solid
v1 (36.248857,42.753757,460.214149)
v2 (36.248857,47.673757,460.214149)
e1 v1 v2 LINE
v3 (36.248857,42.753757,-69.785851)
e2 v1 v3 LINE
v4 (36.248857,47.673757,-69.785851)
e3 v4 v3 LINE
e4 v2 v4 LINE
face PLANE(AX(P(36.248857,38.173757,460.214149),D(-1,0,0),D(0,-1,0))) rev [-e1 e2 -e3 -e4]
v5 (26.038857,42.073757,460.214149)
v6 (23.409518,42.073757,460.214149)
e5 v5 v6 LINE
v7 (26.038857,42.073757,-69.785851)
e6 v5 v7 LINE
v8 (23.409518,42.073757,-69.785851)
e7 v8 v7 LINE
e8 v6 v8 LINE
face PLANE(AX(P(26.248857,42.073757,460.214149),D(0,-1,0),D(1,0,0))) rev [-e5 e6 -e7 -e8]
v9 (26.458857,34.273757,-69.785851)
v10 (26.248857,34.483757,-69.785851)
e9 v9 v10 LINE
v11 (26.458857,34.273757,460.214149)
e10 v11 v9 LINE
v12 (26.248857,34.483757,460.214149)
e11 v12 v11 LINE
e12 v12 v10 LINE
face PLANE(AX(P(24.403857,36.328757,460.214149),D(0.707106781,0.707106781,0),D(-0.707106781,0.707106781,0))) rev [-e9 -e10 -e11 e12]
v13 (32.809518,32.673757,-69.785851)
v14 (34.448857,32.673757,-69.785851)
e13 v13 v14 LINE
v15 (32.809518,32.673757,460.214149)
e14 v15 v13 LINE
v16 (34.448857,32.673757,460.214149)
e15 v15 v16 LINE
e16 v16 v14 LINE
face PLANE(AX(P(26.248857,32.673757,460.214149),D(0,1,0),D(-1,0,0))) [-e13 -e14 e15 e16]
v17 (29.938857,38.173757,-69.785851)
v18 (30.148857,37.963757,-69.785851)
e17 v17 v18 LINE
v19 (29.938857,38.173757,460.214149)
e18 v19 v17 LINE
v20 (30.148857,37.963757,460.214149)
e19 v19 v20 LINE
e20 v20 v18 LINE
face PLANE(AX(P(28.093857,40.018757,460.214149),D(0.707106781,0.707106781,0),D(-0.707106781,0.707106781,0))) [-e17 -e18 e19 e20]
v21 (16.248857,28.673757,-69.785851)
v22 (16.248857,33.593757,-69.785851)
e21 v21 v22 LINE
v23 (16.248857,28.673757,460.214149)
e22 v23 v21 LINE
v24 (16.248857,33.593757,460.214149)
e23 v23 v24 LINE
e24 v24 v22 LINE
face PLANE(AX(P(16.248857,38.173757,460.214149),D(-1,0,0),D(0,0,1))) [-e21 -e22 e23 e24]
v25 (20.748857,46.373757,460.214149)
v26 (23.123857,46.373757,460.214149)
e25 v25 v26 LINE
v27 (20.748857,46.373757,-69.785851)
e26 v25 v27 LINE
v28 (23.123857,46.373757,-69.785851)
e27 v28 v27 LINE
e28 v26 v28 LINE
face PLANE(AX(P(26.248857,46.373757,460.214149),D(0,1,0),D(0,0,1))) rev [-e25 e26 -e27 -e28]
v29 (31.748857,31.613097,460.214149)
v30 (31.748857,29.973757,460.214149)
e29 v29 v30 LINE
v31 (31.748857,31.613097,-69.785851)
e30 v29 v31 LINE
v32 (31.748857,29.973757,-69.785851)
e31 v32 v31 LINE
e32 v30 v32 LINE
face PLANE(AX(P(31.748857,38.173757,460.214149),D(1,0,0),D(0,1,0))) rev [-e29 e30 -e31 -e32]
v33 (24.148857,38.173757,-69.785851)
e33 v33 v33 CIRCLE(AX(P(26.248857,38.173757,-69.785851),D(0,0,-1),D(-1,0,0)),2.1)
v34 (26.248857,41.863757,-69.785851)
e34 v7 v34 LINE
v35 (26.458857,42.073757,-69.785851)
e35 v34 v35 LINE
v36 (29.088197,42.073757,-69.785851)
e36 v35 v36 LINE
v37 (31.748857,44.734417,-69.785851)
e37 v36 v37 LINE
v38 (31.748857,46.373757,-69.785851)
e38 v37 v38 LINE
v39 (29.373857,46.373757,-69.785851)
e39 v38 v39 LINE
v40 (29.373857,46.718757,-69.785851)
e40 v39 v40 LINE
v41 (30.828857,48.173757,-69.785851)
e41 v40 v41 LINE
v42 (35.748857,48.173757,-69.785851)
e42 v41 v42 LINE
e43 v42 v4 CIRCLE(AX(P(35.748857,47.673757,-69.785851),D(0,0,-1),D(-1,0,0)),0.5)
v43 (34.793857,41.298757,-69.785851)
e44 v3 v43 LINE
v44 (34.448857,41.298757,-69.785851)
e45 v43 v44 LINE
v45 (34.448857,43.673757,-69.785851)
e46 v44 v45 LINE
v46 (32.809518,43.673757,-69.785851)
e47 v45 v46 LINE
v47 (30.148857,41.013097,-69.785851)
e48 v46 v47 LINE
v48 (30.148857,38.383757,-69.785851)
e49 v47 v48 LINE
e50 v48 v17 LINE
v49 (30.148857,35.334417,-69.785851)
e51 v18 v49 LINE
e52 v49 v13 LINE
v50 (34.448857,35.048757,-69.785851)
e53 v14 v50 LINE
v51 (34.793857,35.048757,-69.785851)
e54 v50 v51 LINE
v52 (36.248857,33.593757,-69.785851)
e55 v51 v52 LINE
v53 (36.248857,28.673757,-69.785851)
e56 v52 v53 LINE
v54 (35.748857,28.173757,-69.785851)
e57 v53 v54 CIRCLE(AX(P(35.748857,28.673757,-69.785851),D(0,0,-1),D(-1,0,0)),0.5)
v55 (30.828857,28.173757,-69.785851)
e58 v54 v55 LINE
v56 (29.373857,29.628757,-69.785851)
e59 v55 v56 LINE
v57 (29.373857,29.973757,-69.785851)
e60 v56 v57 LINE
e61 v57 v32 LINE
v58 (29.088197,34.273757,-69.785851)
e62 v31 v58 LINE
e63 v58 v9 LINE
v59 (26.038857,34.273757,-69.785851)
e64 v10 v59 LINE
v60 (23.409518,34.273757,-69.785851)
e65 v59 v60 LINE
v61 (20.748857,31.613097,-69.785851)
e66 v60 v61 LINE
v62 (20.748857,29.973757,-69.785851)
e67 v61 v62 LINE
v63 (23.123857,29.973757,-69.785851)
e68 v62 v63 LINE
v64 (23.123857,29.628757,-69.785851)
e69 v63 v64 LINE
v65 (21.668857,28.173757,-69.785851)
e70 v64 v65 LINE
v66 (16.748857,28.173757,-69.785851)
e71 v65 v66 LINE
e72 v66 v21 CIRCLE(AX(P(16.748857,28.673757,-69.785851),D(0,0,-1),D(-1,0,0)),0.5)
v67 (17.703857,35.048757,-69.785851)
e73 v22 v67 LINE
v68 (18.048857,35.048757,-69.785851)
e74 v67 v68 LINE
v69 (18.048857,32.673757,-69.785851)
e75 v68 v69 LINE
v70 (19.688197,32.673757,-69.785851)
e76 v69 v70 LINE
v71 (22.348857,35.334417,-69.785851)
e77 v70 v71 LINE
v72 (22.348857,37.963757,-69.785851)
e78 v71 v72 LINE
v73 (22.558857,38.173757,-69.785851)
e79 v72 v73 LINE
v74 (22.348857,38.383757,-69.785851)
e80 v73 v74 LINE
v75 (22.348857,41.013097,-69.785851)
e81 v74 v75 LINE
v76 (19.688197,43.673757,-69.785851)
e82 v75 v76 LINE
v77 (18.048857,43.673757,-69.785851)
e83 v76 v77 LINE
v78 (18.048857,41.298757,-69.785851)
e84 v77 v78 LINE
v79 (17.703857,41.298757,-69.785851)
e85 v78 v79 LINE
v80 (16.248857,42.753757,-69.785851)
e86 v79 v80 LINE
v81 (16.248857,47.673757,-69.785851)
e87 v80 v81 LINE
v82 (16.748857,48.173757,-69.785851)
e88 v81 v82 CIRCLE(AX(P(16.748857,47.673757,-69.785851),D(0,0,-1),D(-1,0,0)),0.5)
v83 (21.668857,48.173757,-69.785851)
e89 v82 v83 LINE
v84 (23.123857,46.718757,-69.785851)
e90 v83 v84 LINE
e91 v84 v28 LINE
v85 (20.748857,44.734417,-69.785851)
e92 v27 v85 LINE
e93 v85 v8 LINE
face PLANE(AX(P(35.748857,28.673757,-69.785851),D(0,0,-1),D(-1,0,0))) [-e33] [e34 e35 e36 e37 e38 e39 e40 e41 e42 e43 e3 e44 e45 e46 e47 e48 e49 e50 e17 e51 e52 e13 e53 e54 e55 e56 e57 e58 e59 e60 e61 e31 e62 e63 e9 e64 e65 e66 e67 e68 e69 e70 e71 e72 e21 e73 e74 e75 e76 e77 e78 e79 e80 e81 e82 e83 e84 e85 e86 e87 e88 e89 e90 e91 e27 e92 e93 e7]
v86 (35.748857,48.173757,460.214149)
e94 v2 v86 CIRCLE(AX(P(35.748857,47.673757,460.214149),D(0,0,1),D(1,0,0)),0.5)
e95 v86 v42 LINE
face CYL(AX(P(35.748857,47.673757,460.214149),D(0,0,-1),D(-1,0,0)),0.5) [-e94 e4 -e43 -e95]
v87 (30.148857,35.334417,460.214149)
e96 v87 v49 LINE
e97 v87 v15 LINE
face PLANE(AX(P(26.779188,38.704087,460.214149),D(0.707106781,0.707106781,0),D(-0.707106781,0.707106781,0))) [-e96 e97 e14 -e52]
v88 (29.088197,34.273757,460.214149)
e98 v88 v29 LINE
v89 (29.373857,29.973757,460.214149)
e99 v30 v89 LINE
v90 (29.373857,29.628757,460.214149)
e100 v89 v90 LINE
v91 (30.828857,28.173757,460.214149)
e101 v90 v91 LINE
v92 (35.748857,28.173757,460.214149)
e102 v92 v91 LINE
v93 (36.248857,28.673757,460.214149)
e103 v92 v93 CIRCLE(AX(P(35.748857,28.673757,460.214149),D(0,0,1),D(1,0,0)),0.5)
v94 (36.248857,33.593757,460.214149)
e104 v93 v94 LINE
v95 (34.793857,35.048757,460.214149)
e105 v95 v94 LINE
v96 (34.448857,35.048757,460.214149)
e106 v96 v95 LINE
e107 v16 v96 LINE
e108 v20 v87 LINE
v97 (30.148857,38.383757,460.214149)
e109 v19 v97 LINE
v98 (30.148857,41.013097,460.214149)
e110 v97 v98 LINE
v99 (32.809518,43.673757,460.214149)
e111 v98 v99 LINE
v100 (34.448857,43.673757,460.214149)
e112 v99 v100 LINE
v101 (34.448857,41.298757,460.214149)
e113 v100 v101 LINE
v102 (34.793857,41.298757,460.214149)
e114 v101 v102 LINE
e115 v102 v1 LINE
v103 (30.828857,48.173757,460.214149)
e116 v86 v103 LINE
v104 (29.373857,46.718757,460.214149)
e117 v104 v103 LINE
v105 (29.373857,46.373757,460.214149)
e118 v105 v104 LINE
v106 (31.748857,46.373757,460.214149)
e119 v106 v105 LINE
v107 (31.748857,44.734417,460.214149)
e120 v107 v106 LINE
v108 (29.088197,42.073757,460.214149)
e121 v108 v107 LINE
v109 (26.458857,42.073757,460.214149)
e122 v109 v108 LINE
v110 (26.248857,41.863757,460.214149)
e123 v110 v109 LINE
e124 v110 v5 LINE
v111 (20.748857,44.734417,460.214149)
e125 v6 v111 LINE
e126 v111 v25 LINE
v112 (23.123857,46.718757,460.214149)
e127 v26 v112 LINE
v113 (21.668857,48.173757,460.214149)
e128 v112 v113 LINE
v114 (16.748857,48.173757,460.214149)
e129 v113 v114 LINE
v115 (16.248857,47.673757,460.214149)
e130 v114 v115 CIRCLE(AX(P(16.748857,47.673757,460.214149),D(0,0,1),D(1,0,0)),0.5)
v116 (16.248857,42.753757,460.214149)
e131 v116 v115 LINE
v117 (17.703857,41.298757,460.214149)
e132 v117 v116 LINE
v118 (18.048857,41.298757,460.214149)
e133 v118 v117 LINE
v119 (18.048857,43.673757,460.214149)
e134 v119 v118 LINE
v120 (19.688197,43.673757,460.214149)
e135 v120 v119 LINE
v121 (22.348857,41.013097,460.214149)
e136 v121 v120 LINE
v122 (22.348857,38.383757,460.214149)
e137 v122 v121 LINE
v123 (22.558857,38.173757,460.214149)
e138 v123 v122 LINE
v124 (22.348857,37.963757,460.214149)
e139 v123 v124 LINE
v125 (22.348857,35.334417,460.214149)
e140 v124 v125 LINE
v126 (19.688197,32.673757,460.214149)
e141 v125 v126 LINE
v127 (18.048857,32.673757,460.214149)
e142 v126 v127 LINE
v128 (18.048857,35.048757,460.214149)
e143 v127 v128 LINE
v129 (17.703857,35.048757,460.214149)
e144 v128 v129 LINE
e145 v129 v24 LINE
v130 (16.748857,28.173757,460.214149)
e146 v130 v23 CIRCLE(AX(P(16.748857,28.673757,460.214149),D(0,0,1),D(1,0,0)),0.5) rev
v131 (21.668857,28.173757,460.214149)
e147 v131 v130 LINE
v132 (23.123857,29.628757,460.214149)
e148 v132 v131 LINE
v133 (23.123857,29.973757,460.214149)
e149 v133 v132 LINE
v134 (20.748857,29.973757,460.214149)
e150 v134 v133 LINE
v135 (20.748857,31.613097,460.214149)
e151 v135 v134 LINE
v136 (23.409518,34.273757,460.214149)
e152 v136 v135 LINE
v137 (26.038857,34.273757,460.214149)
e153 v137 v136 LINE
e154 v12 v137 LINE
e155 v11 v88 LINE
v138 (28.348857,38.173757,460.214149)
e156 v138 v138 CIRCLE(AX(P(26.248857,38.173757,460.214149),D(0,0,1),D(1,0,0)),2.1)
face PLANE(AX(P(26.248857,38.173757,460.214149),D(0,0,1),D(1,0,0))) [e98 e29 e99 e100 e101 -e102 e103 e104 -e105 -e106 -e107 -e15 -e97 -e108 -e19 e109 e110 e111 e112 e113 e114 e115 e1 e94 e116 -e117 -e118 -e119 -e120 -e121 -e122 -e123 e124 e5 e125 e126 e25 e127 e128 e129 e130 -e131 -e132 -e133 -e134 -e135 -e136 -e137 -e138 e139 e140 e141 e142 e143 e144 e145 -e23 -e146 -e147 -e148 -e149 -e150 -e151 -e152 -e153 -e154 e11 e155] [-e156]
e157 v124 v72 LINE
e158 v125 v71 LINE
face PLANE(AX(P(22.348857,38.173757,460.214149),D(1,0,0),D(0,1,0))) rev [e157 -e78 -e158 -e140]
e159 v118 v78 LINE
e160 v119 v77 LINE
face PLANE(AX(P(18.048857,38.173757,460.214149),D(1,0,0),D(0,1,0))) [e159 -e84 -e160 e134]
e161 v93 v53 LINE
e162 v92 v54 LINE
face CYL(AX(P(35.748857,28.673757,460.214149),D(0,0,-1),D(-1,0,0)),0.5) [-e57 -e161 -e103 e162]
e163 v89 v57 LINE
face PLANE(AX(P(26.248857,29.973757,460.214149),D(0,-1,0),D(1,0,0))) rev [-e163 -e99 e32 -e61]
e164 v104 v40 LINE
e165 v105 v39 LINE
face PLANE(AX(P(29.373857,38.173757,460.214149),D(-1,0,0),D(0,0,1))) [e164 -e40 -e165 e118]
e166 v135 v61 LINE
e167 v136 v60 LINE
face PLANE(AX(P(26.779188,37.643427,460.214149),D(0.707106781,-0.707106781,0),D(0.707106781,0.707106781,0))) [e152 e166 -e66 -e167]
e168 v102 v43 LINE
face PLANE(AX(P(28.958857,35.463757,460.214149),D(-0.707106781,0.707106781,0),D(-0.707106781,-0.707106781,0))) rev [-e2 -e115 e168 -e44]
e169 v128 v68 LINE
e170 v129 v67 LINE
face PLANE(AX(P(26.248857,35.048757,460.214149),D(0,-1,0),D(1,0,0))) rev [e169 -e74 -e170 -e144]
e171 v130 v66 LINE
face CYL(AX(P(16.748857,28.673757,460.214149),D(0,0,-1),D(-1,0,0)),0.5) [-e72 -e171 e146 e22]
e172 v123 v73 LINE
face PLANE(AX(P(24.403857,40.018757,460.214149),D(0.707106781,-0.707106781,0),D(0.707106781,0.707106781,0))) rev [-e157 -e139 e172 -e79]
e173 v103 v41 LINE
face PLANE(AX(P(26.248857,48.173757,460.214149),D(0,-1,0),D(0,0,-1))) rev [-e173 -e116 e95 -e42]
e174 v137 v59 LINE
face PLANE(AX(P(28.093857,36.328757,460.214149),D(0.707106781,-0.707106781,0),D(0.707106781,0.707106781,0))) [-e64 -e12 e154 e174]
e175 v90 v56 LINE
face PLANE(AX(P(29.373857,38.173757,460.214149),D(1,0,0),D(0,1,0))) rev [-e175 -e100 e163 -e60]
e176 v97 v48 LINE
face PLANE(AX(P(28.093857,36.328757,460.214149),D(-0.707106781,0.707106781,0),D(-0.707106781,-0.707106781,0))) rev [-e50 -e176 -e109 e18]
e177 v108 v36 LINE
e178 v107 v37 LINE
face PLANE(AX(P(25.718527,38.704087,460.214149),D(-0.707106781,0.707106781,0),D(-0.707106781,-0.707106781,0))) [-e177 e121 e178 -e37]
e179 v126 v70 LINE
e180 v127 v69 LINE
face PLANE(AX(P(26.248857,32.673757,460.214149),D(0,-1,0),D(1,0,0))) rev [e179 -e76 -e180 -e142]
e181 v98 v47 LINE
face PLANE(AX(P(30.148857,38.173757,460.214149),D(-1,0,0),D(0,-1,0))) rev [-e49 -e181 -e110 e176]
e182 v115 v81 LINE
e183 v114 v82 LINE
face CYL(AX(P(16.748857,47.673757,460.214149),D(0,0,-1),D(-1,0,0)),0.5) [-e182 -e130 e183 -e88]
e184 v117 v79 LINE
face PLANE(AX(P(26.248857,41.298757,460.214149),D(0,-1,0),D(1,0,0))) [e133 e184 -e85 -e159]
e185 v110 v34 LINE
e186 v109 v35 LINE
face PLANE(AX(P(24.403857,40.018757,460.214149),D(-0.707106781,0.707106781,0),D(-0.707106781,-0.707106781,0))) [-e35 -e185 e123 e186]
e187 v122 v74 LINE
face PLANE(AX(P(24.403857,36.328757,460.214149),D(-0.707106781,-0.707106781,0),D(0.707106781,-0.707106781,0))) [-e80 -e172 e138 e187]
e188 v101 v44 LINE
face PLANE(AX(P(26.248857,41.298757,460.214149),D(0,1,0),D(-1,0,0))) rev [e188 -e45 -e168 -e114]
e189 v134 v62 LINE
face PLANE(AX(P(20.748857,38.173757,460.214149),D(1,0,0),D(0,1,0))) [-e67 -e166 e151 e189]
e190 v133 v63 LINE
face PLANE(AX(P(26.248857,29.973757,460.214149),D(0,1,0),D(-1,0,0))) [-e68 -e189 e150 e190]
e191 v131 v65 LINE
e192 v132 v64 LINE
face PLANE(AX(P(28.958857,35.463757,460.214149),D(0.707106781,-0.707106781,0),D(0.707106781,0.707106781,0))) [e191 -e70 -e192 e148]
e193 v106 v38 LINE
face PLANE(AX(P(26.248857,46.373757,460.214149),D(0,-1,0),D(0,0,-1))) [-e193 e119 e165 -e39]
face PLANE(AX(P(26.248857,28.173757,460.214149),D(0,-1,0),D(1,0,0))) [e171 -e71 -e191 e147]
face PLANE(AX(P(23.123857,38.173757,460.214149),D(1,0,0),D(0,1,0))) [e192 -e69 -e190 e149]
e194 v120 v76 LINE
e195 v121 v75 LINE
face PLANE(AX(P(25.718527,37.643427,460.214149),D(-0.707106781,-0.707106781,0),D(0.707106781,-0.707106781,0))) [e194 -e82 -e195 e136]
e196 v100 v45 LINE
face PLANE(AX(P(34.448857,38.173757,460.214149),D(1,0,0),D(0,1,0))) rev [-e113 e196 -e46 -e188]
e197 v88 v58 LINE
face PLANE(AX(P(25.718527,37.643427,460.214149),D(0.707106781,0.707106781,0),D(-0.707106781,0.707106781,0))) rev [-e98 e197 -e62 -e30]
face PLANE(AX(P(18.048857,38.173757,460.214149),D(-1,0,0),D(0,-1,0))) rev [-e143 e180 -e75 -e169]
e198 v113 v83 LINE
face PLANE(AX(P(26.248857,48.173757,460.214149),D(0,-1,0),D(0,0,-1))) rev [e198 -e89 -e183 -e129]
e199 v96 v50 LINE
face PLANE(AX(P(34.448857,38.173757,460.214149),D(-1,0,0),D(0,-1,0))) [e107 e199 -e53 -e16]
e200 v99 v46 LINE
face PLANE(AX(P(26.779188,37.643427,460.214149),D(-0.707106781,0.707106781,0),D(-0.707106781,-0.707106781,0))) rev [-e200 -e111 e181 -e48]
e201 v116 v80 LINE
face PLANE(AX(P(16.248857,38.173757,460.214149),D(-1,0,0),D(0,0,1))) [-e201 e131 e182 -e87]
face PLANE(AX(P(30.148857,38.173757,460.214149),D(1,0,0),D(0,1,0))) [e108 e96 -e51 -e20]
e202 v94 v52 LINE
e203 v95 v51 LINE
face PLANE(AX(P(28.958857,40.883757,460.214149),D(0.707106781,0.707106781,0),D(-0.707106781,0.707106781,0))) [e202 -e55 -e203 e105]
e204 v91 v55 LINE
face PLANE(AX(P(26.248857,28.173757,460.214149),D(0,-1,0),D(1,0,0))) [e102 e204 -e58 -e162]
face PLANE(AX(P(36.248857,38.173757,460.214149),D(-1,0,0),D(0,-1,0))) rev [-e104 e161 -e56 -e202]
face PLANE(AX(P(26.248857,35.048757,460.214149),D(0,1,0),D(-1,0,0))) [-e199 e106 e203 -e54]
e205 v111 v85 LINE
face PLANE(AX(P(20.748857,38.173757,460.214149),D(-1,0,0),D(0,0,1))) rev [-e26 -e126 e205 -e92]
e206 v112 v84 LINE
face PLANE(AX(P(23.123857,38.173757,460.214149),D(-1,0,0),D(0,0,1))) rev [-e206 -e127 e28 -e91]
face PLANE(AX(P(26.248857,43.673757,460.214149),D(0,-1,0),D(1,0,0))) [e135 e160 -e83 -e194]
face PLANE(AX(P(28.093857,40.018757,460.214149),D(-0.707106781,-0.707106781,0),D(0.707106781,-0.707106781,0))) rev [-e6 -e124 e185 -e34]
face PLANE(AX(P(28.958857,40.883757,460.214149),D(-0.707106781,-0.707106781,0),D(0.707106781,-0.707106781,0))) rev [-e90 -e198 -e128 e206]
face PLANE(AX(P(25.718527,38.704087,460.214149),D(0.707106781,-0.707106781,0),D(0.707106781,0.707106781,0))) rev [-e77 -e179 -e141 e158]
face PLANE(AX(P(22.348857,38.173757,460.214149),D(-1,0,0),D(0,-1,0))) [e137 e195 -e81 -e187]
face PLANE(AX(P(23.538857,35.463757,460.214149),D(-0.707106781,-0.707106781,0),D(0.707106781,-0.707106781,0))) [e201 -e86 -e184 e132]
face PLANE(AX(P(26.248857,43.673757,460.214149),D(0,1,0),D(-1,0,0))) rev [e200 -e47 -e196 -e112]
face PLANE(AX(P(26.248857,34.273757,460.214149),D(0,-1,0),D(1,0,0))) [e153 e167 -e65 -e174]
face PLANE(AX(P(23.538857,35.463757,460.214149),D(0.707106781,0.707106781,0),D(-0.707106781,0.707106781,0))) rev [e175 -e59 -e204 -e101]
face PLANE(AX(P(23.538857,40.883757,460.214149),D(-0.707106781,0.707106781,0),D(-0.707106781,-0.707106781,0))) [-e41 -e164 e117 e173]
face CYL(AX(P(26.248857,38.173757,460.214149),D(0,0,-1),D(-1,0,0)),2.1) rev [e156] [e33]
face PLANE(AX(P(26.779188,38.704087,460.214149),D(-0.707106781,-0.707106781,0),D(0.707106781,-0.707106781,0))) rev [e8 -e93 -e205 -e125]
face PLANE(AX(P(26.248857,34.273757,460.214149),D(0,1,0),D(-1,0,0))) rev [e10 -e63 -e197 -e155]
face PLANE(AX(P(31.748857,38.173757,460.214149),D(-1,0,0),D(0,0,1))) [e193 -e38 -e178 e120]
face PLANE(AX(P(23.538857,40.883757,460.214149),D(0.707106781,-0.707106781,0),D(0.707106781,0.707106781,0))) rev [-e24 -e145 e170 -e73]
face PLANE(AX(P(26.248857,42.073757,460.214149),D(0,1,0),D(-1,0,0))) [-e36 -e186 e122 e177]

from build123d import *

# Parameters (mm, degrees)
V_SLOT_START                           = -39.785851387
V_SLOT_20X20X500_LINEAR_RAIL_OUTLINE_R = 2.1
V_SLOT_20X20X500_LINEAR_RAIL_DEPTH     = 500
BOSS_EXTRUDE1_START                    = 30
SKETCH1_R                              = 2.1
BOSS_EXTRUDE1_DEPTH                    = 30


# Read off the part's stored shape, not the designer's step: V-Slot 20x20x500 Linear Rail
with BuildPart() as part:
    # V-Slot 20x20x500 Linear Rail outline → V-Slot 20x20x500 Linear Rail (new body)
    with BuildSketch(Plane.XY.offset(V_SLOT_START)):
        with BuildLine():
            Line((30.148857471, 35.33441708), (30.148857471, 37.963756908))
            Line((30.148857471, 37.963756908), (29.938857471, 38.173756908))
            Line((29.938857471, 38.173756908), (30.148857471, 38.383756908))
            Line((30.148857471, 38.383756908), (30.148857471, 41.013096736))
            Line((30.148857471, 41.013096736), (32.809517643, 43.673756908))
            Line((32.809517643, 43.673756908), (34.448857471, 43.673756908))
            Line((34.448857471, 43.673756908), (34.448857471, 41.298756908))
            Line((34.448857471, 41.298756908), (34.793857471, 41.298756908))
            Line((34.793857471, 41.298756908), (36.248857471, 42.753756908))
            Line((36.248857471, 42.753756908), (36.248857471, 47.673756908))
            ThreePointArc((36.248857471, 47.673756908), (36.102410862, 48.027310299), (35.748857471, 48.173756908))
            Line((35.748857471, 48.173756908), (30.828857471, 48.173756908))
            Line((30.828857471, 48.173756908), (29.373857471, 46.718756908))
            Line((29.373857471, 46.718756908), (29.373857471, 46.373756908))
            Line((29.373857471, 46.373756908), (31.748857471, 46.373756908))
            Line((31.748857471, 46.373756908), (31.748857471, 44.73441708))
            Line((31.748857471, 44.73441708), (29.0881973, 42.073756908))
            Line((29.0881973, 42.073756908), (26.458857471, 42.073756908))
            Line((26.458857471, 42.073756908), (26.248857471, 41.863756908))
            Line((26.248857471, 41.863756908), (26.038857471, 42.073756908))
            Line((26.038857471, 42.073756908), (23.409517643, 42.073756908))
            Line((23.409517643, 42.073756908), (20.748857471, 44.73441708))
            Line((20.748857471, 44.73441708), (20.748857471, 46.373756908))
            Line((20.748857471, 46.373756908), (23.123857471, 46.373756908))
            Line((23.123857471, 46.373756908), (23.123857471, 46.718756908))
            Line((23.123857471, 46.718756908), (21.668857471, 48.173756908))
            Line((21.668857471, 48.173756908), (16.748857471, 48.173756908))
            ThreePointArc((16.748857471, 48.173756908), (16.395304081, 48.027310298), (16.248857471, 47.673756908))
            Line((16.248857471, 47.673756908), (16.248857471, 42.753756908))
            Line((16.248857471, 42.753756908), (17.703857471, 41.298756908))
            Line((17.703857471, 41.298756908), (18.048857471, 41.298756908))
            Line((18.048857471, 41.298756908), (18.048857471, 43.673756908))
            Line((18.048857471, 43.673756908), (19.6881973, 43.673756908))
            Line((19.6881973, 43.673756908), (22.348857471, 41.013096736))
            Line((22.348857471, 41.013096736), (22.348857471, 38.383756908))
            Line((22.348857471, 38.383756908), (22.558857471, 38.173756908))
            Line((22.558857471, 38.173756908), (22.348857471, 37.963756908))
            Line((22.348857471, 37.963756908), (22.348857471, 35.33441708))
            Line((22.348857471, 35.33441708), (19.6881973, 32.673756908))
            Line((19.6881973, 32.673756908), (18.048857471, 32.673756908))
            Line((18.048857471, 32.673756908), (18.048857471, 35.048756908))
            Line((18.048857471, 35.048756908), (17.703857471, 35.048756908))
            Line((17.703857471, 35.048756908), (16.248857471, 33.593756908))
            Line((16.248857471, 33.593756908), (16.248857471, 28.673756908))
            ThreePointArc((16.248857471, 28.673756908), (16.395304081, 28.320203518), (16.748857471, 28.173756908))
            Line((16.748857471, 28.173756908), (21.668857471, 28.173756908))
            Line((21.668857471, 28.173756908), (23.123857471, 29.628756908))
            Line((23.123857471, 29.628756908), (23.123857471, 29.973756908))
            Line((23.123857471, 29.973756908), (20.748857471, 29.973756908))
            Line((20.748857471, 29.973756908), (20.748857471, 31.613096736))
            Line((20.748857471, 31.613096736), (23.409517643, 34.273756908))
            Line((23.409517643, 34.273756908), (26.038857471, 34.273756908))
            Line((26.038857471, 34.273756908), (26.248857471, 34.483756908))
            Line((26.248857471, 34.483756908), (26.458857471, 34.273756908))
            Line((26.458857471, 34.273756908), (29.0881973, 34.273756908))
            Line((29.0881973, 34.273756908), (31.748857471, 31.613096736))
            Line((31.748857471, 31.613096736), (31.748857471, 29.973756908))
            Line((31.748857471, 29.973756908), (29.373857471, 29.973756908))
            Line((29.373857471, 29.973756908), (29.373857471, 29.628756908))
            Line((29.373857471, 29.628756908), (30.828857471, 28.173756908))
            Line((30.828857471, 28.173756908), (35.748857471, 28.173756908))
            ThreePointArc((35.748857471, 28.173756908), (36.102410862, 28.320203518), (36.248857471, 28.673756908))
            Line((36.248857471, 28.673756908), (36.248857471, 33.593756908))
            Line((36.248857471, 33.593756908), (34.793857471, 35.048756908))
            Line((34.793857471, 35.048756908), (34.448857471, 35.048756908))
            Line((34.448857471, 35.048756908), (34.448857471, 32.673756908))
            Line((34.448857471, 32.673756908), (32.809517643, 32.673756908))
            Line((32.809517643, 32.673756908), (30.148857471, 35.33441708))
        make_face()
        with Locations((26.248857471, 38.173756908)):
            Circle(V_SLOT_20X20X500_LINEAR_RAIL_OUTLINE_R, mode=Mode.SUBTRACT)
    extrude(amount=V_SLOT_20X20X500_LINEAR_RAIL_DEPTH)

    # Sketch1 → Boss-Extrude1 (add)
    with BuildSketch(Plane(origin=(0, 0, -39.785851387), x_dir=(-1, 0, 0), z_dir=(0, 0, -1)).offset(BOSS_EXTRUDE1_START)):
        with BuildLine():
            Line((-29.938857471, 38.173756908), (-30.148857471, 37.963756908))
            Line((-30.148857471, 37.963756908), (-30.148857471, 35.33441708))
            Line((-30.148857471, 35.33441708), (-32.809517643, 32.673756908))
            Line((-32.809517643, 32.673756908), (-34.448857471, 32.673756908))
            Line((-34.448857471, 32.673756908), (-34.448857471, 35.048756908))
            Line((-34.448857471, 35.048756908), (-34.793857471, 35.048756908))
            Line((-34.793857471, 35.048756908), (-36.248857471, 33.593756908))
            Line((-36.248857471, 33.593756908), (-36.248857471, 28.673756908))
            ThreePointArc((-36.248857471, 28.673756908), (-36.102410862, 28.320203518), (-35.748857471, 28.173756908))
            Line((-35.748857471, 28.173756908), (-30.828857471, 28.173756908))
            Line((-30.828857471, 28.173756908), (-29.373857471, 29.628756908))
            Line((-29.373857471, 29.628756908), (-29.373857471, 29.973756908))
            Line((-29.373857471, 29.973756908), (-31.748857471, 29.973756908))
            Line((-31.748857471, 29.973756908), (-31.748857471, 31.613096736))
            Line((-31.748857471, 31.613096736), (-29.0881973, 34.273756908))
            Line((-29.0881973, 34.273756908), (-26.458857471, 34.273756908))
            Line((-26.458857471, 34.273756908), (-26.248857471, 34.483756908))
            Line((-26.248857471, 34.483756908), (-26.038857471, 34.273756908))
            Line((-26.038857471, 34.273756908), (-23.409517643, 34.273756908))
            Line((-23.409517643, 34.273756908), (-20.748857471, 31.613096736))
            Line((-20.748857471, 31.613096736), (-20.748857471, 29.973756908))
            Line((-20.748857471, 29.973756908), (-23.123857471, 29.973756908))
            Line((-23.123857471, 29.973756908), (-23.123857471, 29.628756908))
            Line((-23.123857471, 29.628756908), (-21.668857471, 28.173756908))
            Line((-21.668857471, 28.173756908), (-16.748857471, 28.173756908))
            ThreePointArc((-16.748857471, 28.173756908), (-16.395304081, 28.320203518), (-16.248857471, 28.673756908))
            Line((-16.248857471, 28.673756908), (-16.248857471, 33.593756908))
            Line((-16.248857471, 33.593756908), (-17.703857471, 35.048756908))
            Line((-17.703857471, 35.048756908), (-18.048857471, 35.048756908))
            Line((-18.048857471, 35.048756908), (-18.048857471, 32.673756908))
            Line((-18.048857471, 32.673756908), (-19.6881973, 32.673756908))
            Line((-19.6881973, 32.673756908), (-22.348857471, 35.33441708))
            Line((-22.348857471, 35.33441708), (-22.348857471, 37.963756908))
            Line((-22.348857471, 37.963756908), (-22.558857471, 38.173756908))
            Line((-22.558857471, 38.173756908), (-22.348857471, 38.383756908))
            Line((-22.348857471, 38.383756908), (-22.348857471, 41.013096736))
            Line((-22.348857471, 41.013096736), (-19.6881973, 43.673756908))
            Line((-19.6881973, 43.673756908), (-18.048857471, 43.673756908))
            Line((-18.048857471, 43.673756908), (-18.048857471, 41.298756908))
            Line((-18.048857471, 41.298756908), (-17.703857471, 41.298756908))
            Line((-17.703857471, 41.298756908), (-16.248857471, 42.753756908))
            Line((-16.248857471, 42.753756908), (-16.248857471, 47.673756908))
            ThreePointArc((-16.248857471, 47.673756908), (-16.395304081, 48.027310299), (-16.748857471, 48.173756908))
            Line((-16.748857471, 48.173756908), (-21.668857471, 48.173756908))
            Line((-21.668857471, 48.173756908), (-23.123857471, 46.718756908))
            Line((-23.123857471, 46.718756908), (-23.123857471, 46.373756908))
            Line((-23.123857471, 46.373756908), (-20.748857471, 46.373756908))
            Line((-20.748857471, 46.373756908), (-20.748857471, 44.73441708))
            Line((-20.748857471, 44.73441708), (-23.409517643, 42.073756908))
            Line((-23.409517643, 42.073756908), (-26.038857471, 42.073756908))
            Line((-26.038857471, 42.073756908), (-26.248857471, 41.863756908))
            Line((-26.248857471, 41.863756908), (-26.458857471, 42.073756908))
            Line((-26.458857471, 42.073756908), (-29.0881973, 42.073756908))
            Line((-29.0881973, 42.073756908), (-31.748857471, 44.73441708))
            Line((-31.748857471, 44.73441708), (-31.748857471, 46.373756908))
            Line((-31.748857471, 46.373756908), (-29.373857471, 46.373756908))
            Line((-29.373857471, 46.373756908), (-29.373857471, 46.718756908))
            Line((-29.373857471, 46.718756908), (-30.828857471, 48.173756908))
            Line((-30.828857471, 48.173756908), (-35.748857471, 48.173756908))
            ThreePointArc((-35.748857471, 48.173756908), (-36.102410862, 48.027310299), (-36.248857471, 47.673756908))
            Line((-36.248857471, 47.673756908), (-36.248857471, 42.753756908))
            Line((-36.248857471, 42.753756908), (-34.793857471, 41.298756908))
            Line((-34.793857471, 41.298756908), (-34.448857471, 41.298756908))
            Line((-34.448857471, 41.298756908), (-34.448857471, 43.673756908))
            Line((-34.448857471, 43.673756908), (-32.809517643, 43.673756908))
            Line((-32.809517643, 43.673756908), (-30.148857471, 41.013096736))
            Line((-30.148857471, 41.013096736), (-30.148857471, 38.383756908))
            Line((-30.148857471, 38.383756908), (-29.938857471, 38.173756908))
        make_face()
        with Locations((-26.248857471, 38.173756908)):
            Circle(SKETCH1_R, mode=Mode.SUBTRACT)
    extrude(amount=-BOSS_EXTRUDE1_DEPTH)


solid = part.part
